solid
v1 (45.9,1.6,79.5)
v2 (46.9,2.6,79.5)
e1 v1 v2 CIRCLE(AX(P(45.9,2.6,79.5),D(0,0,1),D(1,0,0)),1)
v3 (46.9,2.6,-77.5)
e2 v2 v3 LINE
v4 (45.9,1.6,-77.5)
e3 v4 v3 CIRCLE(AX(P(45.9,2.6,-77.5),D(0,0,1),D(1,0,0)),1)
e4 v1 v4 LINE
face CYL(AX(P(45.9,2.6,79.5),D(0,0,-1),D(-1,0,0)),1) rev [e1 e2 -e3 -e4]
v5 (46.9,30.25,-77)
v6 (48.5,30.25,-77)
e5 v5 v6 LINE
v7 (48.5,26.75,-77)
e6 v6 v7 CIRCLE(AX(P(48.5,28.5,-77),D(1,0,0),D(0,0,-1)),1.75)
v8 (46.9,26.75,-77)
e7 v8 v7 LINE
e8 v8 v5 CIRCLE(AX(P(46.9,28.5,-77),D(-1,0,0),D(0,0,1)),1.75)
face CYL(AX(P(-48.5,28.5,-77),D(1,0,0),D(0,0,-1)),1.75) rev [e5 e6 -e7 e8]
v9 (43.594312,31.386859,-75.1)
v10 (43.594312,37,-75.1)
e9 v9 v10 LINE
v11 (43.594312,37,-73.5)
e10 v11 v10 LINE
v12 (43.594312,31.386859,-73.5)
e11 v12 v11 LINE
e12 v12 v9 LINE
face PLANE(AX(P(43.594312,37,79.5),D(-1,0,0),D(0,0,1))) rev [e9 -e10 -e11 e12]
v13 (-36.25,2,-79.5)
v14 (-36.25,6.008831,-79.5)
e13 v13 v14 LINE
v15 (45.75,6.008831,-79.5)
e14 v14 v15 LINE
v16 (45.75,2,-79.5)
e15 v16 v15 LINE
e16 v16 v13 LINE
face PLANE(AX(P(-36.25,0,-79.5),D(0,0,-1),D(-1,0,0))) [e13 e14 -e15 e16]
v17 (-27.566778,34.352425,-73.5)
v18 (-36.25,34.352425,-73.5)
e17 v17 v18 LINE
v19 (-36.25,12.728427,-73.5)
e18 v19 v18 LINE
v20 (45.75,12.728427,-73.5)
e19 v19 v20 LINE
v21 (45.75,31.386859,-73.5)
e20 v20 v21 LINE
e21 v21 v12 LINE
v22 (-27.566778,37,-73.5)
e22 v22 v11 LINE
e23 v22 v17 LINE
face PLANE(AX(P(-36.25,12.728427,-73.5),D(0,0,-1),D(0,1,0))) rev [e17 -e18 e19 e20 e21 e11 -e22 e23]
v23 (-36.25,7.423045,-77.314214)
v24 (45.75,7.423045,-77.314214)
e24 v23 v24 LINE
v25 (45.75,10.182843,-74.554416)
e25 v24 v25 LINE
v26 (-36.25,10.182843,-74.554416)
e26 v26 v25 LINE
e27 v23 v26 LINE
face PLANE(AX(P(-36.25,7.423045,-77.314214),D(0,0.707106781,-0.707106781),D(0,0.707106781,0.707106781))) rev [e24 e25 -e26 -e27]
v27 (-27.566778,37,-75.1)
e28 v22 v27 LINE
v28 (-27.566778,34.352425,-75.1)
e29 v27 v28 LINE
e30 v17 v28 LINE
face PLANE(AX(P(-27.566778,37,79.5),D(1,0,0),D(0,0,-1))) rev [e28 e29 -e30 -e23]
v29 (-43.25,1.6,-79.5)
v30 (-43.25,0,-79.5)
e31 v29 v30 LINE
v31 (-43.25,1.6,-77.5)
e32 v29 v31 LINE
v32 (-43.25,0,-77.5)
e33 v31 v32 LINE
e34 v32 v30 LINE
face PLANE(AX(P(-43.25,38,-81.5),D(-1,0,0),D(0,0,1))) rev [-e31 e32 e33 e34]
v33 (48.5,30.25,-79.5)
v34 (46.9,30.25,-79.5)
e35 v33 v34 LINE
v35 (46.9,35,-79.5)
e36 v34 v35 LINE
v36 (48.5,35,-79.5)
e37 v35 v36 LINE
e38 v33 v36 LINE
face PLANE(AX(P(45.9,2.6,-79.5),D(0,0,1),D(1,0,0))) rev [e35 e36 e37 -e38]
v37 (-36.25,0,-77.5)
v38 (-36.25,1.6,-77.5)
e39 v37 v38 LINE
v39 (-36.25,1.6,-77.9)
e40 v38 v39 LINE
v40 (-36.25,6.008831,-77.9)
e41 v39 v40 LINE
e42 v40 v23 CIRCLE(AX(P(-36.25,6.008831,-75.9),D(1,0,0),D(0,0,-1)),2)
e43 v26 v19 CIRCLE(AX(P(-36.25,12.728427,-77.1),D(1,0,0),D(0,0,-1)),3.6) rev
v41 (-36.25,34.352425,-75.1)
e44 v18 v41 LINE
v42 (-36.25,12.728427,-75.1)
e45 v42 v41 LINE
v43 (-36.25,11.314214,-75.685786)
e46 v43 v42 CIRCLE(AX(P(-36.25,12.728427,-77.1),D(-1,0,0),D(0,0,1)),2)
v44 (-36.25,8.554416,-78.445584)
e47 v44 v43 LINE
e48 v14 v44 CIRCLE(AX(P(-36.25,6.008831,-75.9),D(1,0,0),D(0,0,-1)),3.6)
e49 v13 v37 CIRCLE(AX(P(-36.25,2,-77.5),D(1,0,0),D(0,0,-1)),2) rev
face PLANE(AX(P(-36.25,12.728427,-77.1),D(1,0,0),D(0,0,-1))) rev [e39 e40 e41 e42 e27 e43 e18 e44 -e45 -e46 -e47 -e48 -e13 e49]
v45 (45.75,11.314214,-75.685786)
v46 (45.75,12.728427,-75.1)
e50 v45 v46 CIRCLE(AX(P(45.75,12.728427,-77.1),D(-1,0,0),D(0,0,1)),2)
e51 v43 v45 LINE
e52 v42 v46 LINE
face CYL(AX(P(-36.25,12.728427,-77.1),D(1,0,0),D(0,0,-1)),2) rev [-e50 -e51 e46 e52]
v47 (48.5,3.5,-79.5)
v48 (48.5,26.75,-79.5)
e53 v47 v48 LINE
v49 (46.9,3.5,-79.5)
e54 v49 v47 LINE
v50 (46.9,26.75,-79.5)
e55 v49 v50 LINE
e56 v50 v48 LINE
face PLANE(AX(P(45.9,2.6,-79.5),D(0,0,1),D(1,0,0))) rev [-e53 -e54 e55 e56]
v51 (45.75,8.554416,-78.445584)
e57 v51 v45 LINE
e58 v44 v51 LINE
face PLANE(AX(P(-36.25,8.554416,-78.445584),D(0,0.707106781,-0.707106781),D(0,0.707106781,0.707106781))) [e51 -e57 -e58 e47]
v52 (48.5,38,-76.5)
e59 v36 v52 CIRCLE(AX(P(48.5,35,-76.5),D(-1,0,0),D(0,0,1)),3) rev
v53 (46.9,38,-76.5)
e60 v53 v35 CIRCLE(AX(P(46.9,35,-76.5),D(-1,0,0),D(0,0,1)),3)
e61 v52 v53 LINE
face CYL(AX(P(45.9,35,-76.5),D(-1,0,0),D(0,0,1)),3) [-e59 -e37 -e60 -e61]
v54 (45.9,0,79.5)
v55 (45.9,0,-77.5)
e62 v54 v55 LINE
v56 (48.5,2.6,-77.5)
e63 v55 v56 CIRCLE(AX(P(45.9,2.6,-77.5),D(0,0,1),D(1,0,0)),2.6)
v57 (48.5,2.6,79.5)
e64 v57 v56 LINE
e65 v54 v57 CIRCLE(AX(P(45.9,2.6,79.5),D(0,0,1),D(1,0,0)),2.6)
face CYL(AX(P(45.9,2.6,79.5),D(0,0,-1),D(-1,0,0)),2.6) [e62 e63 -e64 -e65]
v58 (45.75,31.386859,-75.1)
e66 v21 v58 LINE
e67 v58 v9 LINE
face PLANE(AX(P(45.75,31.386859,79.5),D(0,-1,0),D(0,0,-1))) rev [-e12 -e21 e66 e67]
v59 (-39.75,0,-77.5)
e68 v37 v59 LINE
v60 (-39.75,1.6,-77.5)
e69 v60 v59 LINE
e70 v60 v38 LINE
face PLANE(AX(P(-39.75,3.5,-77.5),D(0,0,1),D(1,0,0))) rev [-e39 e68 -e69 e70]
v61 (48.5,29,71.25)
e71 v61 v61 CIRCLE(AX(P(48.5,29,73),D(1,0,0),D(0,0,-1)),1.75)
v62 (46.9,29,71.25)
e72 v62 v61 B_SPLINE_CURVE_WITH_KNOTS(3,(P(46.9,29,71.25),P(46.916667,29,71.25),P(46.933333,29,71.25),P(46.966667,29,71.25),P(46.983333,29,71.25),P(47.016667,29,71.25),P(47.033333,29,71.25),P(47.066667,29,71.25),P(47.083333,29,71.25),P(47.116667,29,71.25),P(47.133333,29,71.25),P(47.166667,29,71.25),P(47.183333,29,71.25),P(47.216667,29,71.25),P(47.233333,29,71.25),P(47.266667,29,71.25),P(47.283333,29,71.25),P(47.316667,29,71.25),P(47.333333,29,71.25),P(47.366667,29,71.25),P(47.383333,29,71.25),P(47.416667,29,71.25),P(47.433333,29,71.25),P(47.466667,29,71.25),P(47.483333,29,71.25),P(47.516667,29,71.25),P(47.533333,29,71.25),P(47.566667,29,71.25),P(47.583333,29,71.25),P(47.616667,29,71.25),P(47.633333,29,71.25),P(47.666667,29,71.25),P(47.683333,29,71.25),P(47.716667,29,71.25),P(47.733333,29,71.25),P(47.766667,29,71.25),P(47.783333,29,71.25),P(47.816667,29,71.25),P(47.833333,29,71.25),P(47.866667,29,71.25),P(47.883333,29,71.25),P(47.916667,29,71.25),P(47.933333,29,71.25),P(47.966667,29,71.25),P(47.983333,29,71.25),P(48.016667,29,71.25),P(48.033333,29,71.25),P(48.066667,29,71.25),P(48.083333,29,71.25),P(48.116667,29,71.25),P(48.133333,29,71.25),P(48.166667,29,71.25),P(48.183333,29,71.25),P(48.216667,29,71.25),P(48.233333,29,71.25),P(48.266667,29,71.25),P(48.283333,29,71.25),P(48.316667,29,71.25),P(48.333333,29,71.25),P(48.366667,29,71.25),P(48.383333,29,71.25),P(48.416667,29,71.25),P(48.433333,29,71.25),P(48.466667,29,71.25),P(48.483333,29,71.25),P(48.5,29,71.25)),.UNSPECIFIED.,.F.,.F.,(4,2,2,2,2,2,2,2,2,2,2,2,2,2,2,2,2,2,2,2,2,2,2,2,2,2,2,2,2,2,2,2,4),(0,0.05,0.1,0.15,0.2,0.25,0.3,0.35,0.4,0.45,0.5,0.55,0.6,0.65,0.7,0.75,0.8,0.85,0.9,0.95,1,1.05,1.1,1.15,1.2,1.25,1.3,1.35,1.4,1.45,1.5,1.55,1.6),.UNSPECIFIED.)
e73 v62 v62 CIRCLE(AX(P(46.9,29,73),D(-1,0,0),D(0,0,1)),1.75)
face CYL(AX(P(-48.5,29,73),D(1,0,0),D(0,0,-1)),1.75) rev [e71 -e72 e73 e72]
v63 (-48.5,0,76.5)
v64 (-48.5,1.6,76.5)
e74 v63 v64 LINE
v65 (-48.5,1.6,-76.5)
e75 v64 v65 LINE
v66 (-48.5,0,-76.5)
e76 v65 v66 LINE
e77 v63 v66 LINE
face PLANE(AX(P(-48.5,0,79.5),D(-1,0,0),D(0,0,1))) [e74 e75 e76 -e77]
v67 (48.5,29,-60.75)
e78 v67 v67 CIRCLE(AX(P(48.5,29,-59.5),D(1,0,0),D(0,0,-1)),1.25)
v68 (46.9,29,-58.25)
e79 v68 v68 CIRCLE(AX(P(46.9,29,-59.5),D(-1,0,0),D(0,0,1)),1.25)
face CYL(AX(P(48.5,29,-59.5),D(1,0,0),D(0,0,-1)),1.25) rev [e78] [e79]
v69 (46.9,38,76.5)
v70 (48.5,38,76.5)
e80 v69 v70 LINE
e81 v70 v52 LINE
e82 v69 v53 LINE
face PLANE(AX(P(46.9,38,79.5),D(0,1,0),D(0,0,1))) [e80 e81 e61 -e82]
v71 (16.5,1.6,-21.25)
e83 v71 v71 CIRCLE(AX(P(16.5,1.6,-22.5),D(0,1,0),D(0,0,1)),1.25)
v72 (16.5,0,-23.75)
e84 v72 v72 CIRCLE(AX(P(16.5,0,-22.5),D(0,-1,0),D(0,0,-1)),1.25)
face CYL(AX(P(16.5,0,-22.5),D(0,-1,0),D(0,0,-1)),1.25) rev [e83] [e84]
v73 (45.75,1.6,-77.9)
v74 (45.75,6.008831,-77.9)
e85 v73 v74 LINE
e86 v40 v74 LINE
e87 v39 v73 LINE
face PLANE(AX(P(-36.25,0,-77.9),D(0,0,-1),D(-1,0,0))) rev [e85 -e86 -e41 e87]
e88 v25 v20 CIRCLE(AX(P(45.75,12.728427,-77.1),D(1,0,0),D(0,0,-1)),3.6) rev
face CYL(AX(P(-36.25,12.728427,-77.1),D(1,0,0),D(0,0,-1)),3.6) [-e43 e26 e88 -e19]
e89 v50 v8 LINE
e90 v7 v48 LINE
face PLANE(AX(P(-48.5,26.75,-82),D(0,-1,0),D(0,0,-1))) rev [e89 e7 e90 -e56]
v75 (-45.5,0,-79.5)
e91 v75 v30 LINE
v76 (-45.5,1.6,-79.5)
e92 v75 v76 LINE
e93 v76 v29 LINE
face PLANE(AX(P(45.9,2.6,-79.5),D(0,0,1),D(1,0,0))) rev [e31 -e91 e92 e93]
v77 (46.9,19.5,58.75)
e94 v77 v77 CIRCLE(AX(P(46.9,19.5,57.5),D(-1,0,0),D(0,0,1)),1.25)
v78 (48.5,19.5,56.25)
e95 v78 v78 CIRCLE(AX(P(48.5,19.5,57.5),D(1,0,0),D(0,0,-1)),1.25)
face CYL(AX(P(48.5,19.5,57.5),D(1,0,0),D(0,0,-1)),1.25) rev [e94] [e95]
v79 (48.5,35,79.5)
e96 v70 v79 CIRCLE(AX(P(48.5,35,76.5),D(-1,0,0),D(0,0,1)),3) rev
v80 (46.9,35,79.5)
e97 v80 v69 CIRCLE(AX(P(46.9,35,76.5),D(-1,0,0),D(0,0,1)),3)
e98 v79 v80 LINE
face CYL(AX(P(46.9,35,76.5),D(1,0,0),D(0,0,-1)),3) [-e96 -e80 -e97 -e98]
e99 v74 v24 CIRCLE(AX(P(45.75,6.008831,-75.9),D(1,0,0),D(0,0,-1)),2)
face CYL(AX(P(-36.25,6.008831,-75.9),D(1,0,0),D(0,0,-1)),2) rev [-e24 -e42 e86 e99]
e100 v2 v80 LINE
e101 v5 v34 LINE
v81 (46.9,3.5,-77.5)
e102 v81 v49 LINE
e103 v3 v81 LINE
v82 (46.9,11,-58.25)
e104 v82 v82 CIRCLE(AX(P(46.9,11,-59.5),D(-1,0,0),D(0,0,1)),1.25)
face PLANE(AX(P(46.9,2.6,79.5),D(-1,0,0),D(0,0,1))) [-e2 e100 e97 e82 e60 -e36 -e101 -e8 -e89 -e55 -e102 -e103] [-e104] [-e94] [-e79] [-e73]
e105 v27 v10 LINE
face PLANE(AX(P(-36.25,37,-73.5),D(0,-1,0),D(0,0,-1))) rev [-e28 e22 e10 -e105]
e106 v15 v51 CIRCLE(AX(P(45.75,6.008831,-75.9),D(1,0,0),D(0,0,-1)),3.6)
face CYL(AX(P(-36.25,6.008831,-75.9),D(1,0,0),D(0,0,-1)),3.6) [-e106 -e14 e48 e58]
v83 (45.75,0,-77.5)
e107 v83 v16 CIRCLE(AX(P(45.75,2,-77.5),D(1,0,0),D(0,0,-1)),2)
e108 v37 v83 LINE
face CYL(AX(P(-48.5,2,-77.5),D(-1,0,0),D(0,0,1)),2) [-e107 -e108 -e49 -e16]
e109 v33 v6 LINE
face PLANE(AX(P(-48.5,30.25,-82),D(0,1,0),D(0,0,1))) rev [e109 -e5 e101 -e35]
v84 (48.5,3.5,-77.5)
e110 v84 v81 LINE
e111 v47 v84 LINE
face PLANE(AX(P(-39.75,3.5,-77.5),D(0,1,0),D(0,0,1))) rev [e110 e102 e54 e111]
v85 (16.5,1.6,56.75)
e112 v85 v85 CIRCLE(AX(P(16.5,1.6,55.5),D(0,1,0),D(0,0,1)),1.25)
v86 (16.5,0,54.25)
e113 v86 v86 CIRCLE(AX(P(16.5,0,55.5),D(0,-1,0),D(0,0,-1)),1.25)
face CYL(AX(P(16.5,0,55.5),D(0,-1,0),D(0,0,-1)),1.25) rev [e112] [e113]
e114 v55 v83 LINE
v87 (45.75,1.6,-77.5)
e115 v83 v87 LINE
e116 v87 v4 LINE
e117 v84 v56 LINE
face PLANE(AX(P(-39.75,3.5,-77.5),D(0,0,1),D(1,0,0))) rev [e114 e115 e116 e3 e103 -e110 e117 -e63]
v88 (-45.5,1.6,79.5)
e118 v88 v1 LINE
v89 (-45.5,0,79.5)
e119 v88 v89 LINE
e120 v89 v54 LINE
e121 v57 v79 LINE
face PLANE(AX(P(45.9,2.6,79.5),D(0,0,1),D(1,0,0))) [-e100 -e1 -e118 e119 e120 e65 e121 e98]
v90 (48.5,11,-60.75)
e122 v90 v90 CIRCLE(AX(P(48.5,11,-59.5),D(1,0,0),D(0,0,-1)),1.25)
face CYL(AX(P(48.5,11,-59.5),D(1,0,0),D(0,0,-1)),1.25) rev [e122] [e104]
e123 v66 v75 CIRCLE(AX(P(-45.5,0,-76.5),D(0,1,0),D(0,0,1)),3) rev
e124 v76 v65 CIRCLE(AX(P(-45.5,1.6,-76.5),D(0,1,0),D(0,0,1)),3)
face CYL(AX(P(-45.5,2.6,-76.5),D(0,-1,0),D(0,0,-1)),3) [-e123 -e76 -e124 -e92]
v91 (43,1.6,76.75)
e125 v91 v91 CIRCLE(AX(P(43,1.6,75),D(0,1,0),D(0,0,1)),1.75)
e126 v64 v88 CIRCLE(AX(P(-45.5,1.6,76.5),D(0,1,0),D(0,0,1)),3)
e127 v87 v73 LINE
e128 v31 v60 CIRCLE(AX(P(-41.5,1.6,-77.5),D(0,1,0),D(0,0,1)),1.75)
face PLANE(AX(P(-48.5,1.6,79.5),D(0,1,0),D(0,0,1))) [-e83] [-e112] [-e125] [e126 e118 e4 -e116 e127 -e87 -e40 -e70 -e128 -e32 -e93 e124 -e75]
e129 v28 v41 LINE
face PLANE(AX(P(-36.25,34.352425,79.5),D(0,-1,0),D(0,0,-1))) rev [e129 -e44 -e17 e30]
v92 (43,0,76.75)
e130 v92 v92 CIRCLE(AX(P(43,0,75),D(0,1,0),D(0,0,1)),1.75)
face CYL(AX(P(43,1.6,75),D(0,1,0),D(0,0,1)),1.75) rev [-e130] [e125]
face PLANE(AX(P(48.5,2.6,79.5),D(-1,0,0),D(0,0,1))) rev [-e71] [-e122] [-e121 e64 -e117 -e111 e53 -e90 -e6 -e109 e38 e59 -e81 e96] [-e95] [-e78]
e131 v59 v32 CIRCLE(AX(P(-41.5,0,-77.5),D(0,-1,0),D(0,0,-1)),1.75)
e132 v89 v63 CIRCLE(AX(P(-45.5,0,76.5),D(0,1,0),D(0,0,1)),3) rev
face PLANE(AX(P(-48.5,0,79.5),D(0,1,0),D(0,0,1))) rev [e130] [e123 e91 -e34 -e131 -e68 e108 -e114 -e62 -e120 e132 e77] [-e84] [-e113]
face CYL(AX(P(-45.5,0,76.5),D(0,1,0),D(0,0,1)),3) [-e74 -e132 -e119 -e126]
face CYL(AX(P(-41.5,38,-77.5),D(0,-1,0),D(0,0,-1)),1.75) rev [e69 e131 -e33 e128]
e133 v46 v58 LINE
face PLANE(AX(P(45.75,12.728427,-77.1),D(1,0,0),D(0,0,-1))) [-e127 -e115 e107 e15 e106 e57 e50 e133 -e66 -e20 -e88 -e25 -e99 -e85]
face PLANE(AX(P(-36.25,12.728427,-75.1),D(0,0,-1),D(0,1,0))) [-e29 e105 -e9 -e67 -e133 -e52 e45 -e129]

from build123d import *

# Parameters (mm, degrees)
EXTRUDE_THIN1_DEPTH        = 79.5
FILLET1_R                  = 3
EXTRUDE1_DEPTH             = 101.58081328
SKETCH4_W                  = 88.25
SKETCH4_H                  = 2
EXTRUDE2_DEPTH             = 3.5
EXTRUDE_THIN2_START        = -82
EXTRUDE_THIN2_DEPTH        = 82
FILLET2_R                  = 2
SKETCH6_W                  = 2.155687989
SKETCH6_H                  = 5.613141175
SKETCH6_W_2                = 8.683222246
SKETCH6_H_2                = 2.647575272
EXTRUDE3_DEPTH             = 167.425388688
F_3_5_3_5_DIAMETER_HOLE1_D = 3.5
SKETCH9_R                  = 1.75
EXTRUDE4_DEPTH             = 132.046747384
M3_TAPPED_HOLE1_D          = 2.5
M3_TAPPED_HOLE2_D          = 2.5


# Read off the part's stored shape, not the designer's step: Extrude-Thin2
with BuildPart() as part:
    # Sketch1 → Extrude-Thin1 (new, symmetric)
    with BuildSketch(Plane.XY):
        with BuildLine():
            Line((-48.5, 0), (45.9, 0))
            ThreePointArc((45.9, 0), (47.738477631, 0.761522369), (48.5, 2.6))
            Line((48.5, 2.6), (48.5, 38))
            Line((48.5, 38), (46.9, 38))
            Line((46.9, 38), (46.9, 2.6))
            ThreePointArc((46.9, 2.6), (46.607106781, 1.892893219), (45.9, 1.6))
            Line((45.9, 1.6), (-48.5, 1.6))
            Line((-48.5, 1.6), (-48.5, 0))
        make_face()
    extrude(amount=EXTRUDE_THIN1_DEPTH, both=True)

    # Fillet1
    fillet1_edges = [part.edges().sort_by_distance(p)[0] for p in [
        (-48.5, 0.8, 79.5),
        (47.7, 38, 79.5),
        (-48.5, 0.8, -79.5),
        (47.7, 38, -79.5),
    ]]
    fillet(fillet1_edges, radius=FILLET1_R)

    # Sketch3 → Extrude1 (cut, through all)
    with BuildSketch(Plane.XZ):
        with BuildLine():
            Line((-43.25, -81.5), (-43.25, -77.5))
            ThreePointArc((-43.25, -77.5), (-41.5, -75.75), (-39.75, -77.5))
            Line((-39.75, -77.5), (-39.75, -81.5))
            ThreePointArc((-39.75, -81.5), (-41.5, -83.25), (-43.25, -81.5))
        make_face()
    extrude(amount=-EXTRUDE1_DEPTH, mode=Mode.SUBTRACT)

    # Sketch4 → Extrude2 (cut)
    with BuildSketch(Plane.XZ):
        with Locations((4.375, -78.5)):
            Rectangle(SKETCH4_W, SKETCH4_H)
    extrude(amount=-EXTRUDE2_DEPTH, mode=Mode.SUBTRACT)

    # Extrude-Thin2 outline → Extrude-Thin2 (add)
    with BuildSketch(Plane(origin=(45.75, 0, 0), x_dir=(0, 0, -1), z_dir=(1, 0, 0)).offset(EXTRUDE_THIN2_START)):
        with BuildLine():
            Line((77.5, 0), (79.5, 0))
            Line((79.5, 0), (79.5, 6.008831175))
            ThreePointArc((79.5, 6.008831175), (79.225966317, 7.386491532), (78.445584412, 8.554415588))
            Line((78.445584412, 8.554415588), (75.685786438, 11.314213562))
            ThreePointArc((75.685786438, 11.314213562), (75.252240935, 11.96306026), (75.1, 12.728427125))
            Line((75.1, 12.728427125), (75.1, 37))
            Line((75.1, 37), (73.5, 37))
            Line((73.5, 37), (73.5, 12.728427125))
            ThreePointArc((73.5, 12.728427125), (73.774033683, 11.350766768), (74.554415588, 10.182842712))
            Line((74.554415588, 10.182842712), (77.314213562, 7.423044738))
            ThreePointArc((77.314213562, 7.423044738), (77.747759065, 6.77419804), (77.9, 6.008831175))
            Line((77.9, 6.008831175), (77.9, 1.6))
            Line((77.9, 1.6), (77.5, 1.6))
            Line((77.5, 1.6), (77.5, 0))
        make_face()
    extrude(amount=EXTRUDE_THIN2_DEPTH)

    # Fillet2
    fillet2_edges = [part.edges().sort_by_distance(p)[0] for p in [
        (4.75, 0, -79.5),
    ]]
    fillet(fillet2_edges, radius=FILLET2_R)

    # Sketch6 → Extrude3 (cut, through all)
    with BuildSketch(Plane(origin=(0, 0, -75.1), x_dir=(-1, 0, 0), z_dir=(0, 0, -1))):
        with Locations((-44.672156005, 34.193429413)):
            Rectangle(SKETCH6_W, SKETCH6_H)
        with Locations((31.908388877, 35.676212364)):
            Rectangle(SKETCH6_W_2, SKETCH6_H_2)
    extrude(amount=-EXTRUDE3_DEPTH, mode=Mode.SUBTRACT)

    # Ø3.5 (3.5) Diameter Hole1 (through all)
    with Locations(Plane(origin=(0, 1.6, 0), x_dir=(-1, 0, 0), z_dir=(0, 1, 0))):
        with Locations((-43, 75)):
            Hole(F_3_5_3_5_DIAMETER_HOLE1_D / 2)

    # Sketch9 → Extrude4 (cut, through all)
    with BuildSketch(Plane(origin=(48.5, 0, 0), x_dir=(0, 0, -1), z_dir=(1, 0, 0))):
        with Locations((-73, 29)):
            Circle(SKETCH9_R)
        with BuildLine():
            Line((82, 26.75), (77, 26.75))
            ThreePointArc((77, 26.75), (75.25, 28.5), (77, 30.25))
            Line((77, 30.25), (82, 30.25))
            ThreePointArc((82, 30.25), (83.75, 28.5), (82, 26.75))
        make_face()
    extrude(amount=-EXTRUDE4_DEPTH, mode=Mode.SUBTRACT)

    # M3 Tapped Hole1 (through all)
    with Locations(Plane(origin=(48.5, 0, 0), x_dir=(0, 0, -1), z_dir=(1, 0, 0))):
        with Locations((-57.5, 19.5), (59.5, 29), (59.5, 11)):
            Hole(M3_TAPPED_HOLE1_D / 2)

    # M3 Tapped Hole2 (through all)
    with Locations(Plane.XZ):
        with Locations((16.5, 55.5), (16.5, -22.5)):
            Hole(M3_TAPPED_HOLE2_D / 2)


solid = part.part
